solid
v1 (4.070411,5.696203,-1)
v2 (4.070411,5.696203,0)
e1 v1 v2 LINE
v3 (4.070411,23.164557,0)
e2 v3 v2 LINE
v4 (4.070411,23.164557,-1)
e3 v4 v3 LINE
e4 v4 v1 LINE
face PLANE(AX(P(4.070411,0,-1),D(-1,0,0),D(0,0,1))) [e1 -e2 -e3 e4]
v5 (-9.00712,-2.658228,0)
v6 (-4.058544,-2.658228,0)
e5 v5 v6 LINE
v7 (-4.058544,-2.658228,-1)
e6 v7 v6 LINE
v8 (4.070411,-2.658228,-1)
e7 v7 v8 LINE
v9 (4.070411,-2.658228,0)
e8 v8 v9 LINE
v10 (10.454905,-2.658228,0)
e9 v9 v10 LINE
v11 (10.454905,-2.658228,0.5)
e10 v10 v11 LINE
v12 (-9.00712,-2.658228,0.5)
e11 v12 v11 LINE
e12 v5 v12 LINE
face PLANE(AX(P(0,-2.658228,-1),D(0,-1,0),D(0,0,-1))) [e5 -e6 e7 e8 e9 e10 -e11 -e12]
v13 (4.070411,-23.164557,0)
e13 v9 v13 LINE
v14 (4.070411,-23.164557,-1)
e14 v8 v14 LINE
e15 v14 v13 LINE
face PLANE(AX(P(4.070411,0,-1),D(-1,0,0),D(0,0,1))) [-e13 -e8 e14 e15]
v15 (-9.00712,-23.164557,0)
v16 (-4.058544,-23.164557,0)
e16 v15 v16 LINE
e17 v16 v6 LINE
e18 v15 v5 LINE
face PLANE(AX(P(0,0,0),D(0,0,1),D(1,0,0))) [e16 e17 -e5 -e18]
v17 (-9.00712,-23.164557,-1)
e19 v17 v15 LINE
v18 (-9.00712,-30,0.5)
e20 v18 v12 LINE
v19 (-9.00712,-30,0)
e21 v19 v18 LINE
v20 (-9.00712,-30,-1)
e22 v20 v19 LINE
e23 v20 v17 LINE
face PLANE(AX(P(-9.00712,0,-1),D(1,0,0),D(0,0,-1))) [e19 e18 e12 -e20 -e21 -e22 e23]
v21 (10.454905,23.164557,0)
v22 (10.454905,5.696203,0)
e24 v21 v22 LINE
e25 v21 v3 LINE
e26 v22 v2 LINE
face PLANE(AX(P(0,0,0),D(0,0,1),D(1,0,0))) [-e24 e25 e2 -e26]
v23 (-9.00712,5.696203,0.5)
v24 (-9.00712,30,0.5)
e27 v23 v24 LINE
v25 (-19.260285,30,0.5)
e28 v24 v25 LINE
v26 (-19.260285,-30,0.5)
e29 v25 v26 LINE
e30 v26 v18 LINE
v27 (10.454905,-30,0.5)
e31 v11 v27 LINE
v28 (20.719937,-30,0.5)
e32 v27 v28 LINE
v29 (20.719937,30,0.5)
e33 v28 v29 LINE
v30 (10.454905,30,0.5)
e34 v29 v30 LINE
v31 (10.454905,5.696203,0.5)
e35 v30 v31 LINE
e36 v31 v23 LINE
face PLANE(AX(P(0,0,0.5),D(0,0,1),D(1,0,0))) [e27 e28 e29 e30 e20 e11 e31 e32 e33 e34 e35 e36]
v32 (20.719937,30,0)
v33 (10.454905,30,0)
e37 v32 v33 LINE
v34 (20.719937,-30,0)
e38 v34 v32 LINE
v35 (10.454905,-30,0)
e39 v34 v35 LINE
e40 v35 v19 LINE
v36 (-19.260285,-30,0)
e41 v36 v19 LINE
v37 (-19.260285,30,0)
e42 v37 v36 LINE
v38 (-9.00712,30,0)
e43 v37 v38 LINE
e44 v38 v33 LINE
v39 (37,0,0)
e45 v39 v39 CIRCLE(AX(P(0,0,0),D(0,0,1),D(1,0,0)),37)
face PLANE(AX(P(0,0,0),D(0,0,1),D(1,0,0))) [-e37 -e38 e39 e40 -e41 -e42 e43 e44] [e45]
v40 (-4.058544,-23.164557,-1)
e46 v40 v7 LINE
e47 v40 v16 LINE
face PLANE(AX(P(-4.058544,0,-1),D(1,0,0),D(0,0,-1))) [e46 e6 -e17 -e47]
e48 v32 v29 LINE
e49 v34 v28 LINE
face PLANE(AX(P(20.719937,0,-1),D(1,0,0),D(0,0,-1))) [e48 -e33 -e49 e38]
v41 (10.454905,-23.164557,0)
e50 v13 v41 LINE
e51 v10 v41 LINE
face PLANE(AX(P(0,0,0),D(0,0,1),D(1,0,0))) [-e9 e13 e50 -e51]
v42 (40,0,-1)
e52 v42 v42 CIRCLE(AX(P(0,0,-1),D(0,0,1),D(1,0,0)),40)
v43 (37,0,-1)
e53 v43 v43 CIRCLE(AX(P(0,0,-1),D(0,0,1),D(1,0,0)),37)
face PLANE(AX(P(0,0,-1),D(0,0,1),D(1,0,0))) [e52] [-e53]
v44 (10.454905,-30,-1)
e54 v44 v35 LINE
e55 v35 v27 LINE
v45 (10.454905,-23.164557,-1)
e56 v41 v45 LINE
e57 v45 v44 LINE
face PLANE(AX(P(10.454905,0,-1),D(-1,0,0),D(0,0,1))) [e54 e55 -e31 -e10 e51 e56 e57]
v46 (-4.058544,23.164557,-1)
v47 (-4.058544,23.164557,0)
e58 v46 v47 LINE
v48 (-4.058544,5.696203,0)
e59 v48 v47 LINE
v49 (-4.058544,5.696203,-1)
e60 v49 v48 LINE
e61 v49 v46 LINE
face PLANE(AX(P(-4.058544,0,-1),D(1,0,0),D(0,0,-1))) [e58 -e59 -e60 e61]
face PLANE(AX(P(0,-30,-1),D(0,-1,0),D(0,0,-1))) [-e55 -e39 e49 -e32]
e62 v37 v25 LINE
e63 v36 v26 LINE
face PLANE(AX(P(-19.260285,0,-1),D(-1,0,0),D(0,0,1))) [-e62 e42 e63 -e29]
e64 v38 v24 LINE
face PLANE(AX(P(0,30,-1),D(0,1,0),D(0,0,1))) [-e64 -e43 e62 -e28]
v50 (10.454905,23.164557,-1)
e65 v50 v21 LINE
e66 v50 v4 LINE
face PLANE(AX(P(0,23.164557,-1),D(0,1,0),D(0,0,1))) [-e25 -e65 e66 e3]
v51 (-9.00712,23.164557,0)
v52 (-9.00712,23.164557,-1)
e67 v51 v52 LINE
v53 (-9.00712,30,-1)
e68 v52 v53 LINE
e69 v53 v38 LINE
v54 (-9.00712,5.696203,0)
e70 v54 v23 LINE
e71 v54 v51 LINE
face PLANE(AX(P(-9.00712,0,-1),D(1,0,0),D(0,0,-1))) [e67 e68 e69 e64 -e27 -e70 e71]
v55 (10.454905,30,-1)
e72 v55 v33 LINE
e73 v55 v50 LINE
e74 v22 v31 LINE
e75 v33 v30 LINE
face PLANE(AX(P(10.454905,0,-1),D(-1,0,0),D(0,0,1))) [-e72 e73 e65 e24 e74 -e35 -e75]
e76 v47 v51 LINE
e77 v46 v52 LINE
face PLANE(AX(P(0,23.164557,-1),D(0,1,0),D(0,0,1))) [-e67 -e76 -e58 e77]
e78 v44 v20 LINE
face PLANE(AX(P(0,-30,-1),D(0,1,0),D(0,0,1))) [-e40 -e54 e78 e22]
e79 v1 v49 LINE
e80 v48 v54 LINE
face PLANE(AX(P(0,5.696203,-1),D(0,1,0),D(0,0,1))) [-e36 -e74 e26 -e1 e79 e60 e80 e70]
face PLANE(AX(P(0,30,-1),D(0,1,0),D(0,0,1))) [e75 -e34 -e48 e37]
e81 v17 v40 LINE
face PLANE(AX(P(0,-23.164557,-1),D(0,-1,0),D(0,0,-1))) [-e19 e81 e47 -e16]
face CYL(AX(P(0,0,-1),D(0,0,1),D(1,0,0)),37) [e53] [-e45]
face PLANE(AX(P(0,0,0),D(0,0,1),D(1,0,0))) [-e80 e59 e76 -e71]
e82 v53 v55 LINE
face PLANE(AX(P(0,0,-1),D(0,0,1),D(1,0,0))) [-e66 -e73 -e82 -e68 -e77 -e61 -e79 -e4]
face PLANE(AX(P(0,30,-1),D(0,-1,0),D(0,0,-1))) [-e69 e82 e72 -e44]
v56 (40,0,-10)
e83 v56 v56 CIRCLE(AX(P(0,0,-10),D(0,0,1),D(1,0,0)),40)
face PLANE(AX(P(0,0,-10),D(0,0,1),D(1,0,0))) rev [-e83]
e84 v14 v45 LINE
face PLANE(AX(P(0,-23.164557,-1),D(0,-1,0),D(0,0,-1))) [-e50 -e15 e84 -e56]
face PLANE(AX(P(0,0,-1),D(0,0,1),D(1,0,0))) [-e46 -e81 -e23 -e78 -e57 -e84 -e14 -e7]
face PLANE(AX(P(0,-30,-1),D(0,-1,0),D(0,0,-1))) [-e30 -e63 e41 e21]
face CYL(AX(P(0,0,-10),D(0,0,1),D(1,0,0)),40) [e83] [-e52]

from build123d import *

# Parameters (mm, degrees)
SKETCH2_R                = 40
BOSS_EXTRUDE1_DEPTH      = 10
CUT_EXTRUDE1_START       = -1
CUT_EXTRUDE1_OUTLINE_R   = 40
CUT_EXTRUDE1_OUTLINE_R_2 = 37
CUT_EXTRUDE1_DEPTH       = 1
CUT_EXTRUDE1_2_DEPTH     = 0.5


# Read off the part's stored shape, not the designer's step: Cut-Extrude1
with BuildPart() as part:
    # Sketch2 → Boss-Extrude1 (new body)
    with BuildSketch(Plane.XY):
        Circle(SKETCH2_R)
    extrude(amount=-BOSS_EXTRUDE1_DEPTH)

    # Cut-Extrude1 outline → Cut-Extrude1 (cut)
    # profile 1 of 3: a face of its own
    with BuildSketch(Plane.XY.offset(CUT_EXTRUDE1_START)):
        Circle(CUT_EXTRUDE1_OUTLINE_R)
        Circle(CUT_EXTRUDE1_OUTLINE_R_2, mode=Mode.SUBTRACT)
    # profile 2 of 3: a face of its own
    with BuildSketch(Plane.XY.offset(CUT_EXTRUDE1_START)):
        Polygon((-9.007120253, -30), (10.454905063, -30), (10.454905063, -23.164556962), (4.070411392, -23.164556962), (4.070411392, -2.658227848), (-4.058544304, -2.658227848), (-4.058544304, -23.164556962), (-9.007120253, -23.164556962), align=None)
    # profile 3 of 3: a face of its own
    with BuildSketch(Plane.XY.offset(CUT_EXTRUDE1_START)):
        Polygon((-4.058544304, 5.696202532), (4.070411392, 5.696202532), (4.070411392, 23.164556962), (10.454905063, 23.164556962), (10.454905063, 30), (-9.007120253, 30), (-9.007120253, 23.164556962), (-4.058544304, 23.164556962), align=None)
    extrude(amount=CUT_EXTRUDE1_DEPTH, mode=Mode.SUBTRACT)

    # Cut-Extrude1 2 outline → Cut-Extrude1 2 (add)
    with BuildSketch(Plane.XY):
        Polygon((10.454905063, 30), (10.454905063, 5.696202532), (-9.007120253, 5.696202532), (-9.007120253, 30), (-19.26028481, 30), (-19.26028481, -30), (-9.007120253, -30), (-9.007120253, -2.658227848), (10.454905063, -2.658227848), (10.454905063, -30), (20.719936709, -30), (20.719936709, 30), align=None)
    extrude(amount=CUT_EXTRUDE1_2_DEPTH)


solid = part.part
